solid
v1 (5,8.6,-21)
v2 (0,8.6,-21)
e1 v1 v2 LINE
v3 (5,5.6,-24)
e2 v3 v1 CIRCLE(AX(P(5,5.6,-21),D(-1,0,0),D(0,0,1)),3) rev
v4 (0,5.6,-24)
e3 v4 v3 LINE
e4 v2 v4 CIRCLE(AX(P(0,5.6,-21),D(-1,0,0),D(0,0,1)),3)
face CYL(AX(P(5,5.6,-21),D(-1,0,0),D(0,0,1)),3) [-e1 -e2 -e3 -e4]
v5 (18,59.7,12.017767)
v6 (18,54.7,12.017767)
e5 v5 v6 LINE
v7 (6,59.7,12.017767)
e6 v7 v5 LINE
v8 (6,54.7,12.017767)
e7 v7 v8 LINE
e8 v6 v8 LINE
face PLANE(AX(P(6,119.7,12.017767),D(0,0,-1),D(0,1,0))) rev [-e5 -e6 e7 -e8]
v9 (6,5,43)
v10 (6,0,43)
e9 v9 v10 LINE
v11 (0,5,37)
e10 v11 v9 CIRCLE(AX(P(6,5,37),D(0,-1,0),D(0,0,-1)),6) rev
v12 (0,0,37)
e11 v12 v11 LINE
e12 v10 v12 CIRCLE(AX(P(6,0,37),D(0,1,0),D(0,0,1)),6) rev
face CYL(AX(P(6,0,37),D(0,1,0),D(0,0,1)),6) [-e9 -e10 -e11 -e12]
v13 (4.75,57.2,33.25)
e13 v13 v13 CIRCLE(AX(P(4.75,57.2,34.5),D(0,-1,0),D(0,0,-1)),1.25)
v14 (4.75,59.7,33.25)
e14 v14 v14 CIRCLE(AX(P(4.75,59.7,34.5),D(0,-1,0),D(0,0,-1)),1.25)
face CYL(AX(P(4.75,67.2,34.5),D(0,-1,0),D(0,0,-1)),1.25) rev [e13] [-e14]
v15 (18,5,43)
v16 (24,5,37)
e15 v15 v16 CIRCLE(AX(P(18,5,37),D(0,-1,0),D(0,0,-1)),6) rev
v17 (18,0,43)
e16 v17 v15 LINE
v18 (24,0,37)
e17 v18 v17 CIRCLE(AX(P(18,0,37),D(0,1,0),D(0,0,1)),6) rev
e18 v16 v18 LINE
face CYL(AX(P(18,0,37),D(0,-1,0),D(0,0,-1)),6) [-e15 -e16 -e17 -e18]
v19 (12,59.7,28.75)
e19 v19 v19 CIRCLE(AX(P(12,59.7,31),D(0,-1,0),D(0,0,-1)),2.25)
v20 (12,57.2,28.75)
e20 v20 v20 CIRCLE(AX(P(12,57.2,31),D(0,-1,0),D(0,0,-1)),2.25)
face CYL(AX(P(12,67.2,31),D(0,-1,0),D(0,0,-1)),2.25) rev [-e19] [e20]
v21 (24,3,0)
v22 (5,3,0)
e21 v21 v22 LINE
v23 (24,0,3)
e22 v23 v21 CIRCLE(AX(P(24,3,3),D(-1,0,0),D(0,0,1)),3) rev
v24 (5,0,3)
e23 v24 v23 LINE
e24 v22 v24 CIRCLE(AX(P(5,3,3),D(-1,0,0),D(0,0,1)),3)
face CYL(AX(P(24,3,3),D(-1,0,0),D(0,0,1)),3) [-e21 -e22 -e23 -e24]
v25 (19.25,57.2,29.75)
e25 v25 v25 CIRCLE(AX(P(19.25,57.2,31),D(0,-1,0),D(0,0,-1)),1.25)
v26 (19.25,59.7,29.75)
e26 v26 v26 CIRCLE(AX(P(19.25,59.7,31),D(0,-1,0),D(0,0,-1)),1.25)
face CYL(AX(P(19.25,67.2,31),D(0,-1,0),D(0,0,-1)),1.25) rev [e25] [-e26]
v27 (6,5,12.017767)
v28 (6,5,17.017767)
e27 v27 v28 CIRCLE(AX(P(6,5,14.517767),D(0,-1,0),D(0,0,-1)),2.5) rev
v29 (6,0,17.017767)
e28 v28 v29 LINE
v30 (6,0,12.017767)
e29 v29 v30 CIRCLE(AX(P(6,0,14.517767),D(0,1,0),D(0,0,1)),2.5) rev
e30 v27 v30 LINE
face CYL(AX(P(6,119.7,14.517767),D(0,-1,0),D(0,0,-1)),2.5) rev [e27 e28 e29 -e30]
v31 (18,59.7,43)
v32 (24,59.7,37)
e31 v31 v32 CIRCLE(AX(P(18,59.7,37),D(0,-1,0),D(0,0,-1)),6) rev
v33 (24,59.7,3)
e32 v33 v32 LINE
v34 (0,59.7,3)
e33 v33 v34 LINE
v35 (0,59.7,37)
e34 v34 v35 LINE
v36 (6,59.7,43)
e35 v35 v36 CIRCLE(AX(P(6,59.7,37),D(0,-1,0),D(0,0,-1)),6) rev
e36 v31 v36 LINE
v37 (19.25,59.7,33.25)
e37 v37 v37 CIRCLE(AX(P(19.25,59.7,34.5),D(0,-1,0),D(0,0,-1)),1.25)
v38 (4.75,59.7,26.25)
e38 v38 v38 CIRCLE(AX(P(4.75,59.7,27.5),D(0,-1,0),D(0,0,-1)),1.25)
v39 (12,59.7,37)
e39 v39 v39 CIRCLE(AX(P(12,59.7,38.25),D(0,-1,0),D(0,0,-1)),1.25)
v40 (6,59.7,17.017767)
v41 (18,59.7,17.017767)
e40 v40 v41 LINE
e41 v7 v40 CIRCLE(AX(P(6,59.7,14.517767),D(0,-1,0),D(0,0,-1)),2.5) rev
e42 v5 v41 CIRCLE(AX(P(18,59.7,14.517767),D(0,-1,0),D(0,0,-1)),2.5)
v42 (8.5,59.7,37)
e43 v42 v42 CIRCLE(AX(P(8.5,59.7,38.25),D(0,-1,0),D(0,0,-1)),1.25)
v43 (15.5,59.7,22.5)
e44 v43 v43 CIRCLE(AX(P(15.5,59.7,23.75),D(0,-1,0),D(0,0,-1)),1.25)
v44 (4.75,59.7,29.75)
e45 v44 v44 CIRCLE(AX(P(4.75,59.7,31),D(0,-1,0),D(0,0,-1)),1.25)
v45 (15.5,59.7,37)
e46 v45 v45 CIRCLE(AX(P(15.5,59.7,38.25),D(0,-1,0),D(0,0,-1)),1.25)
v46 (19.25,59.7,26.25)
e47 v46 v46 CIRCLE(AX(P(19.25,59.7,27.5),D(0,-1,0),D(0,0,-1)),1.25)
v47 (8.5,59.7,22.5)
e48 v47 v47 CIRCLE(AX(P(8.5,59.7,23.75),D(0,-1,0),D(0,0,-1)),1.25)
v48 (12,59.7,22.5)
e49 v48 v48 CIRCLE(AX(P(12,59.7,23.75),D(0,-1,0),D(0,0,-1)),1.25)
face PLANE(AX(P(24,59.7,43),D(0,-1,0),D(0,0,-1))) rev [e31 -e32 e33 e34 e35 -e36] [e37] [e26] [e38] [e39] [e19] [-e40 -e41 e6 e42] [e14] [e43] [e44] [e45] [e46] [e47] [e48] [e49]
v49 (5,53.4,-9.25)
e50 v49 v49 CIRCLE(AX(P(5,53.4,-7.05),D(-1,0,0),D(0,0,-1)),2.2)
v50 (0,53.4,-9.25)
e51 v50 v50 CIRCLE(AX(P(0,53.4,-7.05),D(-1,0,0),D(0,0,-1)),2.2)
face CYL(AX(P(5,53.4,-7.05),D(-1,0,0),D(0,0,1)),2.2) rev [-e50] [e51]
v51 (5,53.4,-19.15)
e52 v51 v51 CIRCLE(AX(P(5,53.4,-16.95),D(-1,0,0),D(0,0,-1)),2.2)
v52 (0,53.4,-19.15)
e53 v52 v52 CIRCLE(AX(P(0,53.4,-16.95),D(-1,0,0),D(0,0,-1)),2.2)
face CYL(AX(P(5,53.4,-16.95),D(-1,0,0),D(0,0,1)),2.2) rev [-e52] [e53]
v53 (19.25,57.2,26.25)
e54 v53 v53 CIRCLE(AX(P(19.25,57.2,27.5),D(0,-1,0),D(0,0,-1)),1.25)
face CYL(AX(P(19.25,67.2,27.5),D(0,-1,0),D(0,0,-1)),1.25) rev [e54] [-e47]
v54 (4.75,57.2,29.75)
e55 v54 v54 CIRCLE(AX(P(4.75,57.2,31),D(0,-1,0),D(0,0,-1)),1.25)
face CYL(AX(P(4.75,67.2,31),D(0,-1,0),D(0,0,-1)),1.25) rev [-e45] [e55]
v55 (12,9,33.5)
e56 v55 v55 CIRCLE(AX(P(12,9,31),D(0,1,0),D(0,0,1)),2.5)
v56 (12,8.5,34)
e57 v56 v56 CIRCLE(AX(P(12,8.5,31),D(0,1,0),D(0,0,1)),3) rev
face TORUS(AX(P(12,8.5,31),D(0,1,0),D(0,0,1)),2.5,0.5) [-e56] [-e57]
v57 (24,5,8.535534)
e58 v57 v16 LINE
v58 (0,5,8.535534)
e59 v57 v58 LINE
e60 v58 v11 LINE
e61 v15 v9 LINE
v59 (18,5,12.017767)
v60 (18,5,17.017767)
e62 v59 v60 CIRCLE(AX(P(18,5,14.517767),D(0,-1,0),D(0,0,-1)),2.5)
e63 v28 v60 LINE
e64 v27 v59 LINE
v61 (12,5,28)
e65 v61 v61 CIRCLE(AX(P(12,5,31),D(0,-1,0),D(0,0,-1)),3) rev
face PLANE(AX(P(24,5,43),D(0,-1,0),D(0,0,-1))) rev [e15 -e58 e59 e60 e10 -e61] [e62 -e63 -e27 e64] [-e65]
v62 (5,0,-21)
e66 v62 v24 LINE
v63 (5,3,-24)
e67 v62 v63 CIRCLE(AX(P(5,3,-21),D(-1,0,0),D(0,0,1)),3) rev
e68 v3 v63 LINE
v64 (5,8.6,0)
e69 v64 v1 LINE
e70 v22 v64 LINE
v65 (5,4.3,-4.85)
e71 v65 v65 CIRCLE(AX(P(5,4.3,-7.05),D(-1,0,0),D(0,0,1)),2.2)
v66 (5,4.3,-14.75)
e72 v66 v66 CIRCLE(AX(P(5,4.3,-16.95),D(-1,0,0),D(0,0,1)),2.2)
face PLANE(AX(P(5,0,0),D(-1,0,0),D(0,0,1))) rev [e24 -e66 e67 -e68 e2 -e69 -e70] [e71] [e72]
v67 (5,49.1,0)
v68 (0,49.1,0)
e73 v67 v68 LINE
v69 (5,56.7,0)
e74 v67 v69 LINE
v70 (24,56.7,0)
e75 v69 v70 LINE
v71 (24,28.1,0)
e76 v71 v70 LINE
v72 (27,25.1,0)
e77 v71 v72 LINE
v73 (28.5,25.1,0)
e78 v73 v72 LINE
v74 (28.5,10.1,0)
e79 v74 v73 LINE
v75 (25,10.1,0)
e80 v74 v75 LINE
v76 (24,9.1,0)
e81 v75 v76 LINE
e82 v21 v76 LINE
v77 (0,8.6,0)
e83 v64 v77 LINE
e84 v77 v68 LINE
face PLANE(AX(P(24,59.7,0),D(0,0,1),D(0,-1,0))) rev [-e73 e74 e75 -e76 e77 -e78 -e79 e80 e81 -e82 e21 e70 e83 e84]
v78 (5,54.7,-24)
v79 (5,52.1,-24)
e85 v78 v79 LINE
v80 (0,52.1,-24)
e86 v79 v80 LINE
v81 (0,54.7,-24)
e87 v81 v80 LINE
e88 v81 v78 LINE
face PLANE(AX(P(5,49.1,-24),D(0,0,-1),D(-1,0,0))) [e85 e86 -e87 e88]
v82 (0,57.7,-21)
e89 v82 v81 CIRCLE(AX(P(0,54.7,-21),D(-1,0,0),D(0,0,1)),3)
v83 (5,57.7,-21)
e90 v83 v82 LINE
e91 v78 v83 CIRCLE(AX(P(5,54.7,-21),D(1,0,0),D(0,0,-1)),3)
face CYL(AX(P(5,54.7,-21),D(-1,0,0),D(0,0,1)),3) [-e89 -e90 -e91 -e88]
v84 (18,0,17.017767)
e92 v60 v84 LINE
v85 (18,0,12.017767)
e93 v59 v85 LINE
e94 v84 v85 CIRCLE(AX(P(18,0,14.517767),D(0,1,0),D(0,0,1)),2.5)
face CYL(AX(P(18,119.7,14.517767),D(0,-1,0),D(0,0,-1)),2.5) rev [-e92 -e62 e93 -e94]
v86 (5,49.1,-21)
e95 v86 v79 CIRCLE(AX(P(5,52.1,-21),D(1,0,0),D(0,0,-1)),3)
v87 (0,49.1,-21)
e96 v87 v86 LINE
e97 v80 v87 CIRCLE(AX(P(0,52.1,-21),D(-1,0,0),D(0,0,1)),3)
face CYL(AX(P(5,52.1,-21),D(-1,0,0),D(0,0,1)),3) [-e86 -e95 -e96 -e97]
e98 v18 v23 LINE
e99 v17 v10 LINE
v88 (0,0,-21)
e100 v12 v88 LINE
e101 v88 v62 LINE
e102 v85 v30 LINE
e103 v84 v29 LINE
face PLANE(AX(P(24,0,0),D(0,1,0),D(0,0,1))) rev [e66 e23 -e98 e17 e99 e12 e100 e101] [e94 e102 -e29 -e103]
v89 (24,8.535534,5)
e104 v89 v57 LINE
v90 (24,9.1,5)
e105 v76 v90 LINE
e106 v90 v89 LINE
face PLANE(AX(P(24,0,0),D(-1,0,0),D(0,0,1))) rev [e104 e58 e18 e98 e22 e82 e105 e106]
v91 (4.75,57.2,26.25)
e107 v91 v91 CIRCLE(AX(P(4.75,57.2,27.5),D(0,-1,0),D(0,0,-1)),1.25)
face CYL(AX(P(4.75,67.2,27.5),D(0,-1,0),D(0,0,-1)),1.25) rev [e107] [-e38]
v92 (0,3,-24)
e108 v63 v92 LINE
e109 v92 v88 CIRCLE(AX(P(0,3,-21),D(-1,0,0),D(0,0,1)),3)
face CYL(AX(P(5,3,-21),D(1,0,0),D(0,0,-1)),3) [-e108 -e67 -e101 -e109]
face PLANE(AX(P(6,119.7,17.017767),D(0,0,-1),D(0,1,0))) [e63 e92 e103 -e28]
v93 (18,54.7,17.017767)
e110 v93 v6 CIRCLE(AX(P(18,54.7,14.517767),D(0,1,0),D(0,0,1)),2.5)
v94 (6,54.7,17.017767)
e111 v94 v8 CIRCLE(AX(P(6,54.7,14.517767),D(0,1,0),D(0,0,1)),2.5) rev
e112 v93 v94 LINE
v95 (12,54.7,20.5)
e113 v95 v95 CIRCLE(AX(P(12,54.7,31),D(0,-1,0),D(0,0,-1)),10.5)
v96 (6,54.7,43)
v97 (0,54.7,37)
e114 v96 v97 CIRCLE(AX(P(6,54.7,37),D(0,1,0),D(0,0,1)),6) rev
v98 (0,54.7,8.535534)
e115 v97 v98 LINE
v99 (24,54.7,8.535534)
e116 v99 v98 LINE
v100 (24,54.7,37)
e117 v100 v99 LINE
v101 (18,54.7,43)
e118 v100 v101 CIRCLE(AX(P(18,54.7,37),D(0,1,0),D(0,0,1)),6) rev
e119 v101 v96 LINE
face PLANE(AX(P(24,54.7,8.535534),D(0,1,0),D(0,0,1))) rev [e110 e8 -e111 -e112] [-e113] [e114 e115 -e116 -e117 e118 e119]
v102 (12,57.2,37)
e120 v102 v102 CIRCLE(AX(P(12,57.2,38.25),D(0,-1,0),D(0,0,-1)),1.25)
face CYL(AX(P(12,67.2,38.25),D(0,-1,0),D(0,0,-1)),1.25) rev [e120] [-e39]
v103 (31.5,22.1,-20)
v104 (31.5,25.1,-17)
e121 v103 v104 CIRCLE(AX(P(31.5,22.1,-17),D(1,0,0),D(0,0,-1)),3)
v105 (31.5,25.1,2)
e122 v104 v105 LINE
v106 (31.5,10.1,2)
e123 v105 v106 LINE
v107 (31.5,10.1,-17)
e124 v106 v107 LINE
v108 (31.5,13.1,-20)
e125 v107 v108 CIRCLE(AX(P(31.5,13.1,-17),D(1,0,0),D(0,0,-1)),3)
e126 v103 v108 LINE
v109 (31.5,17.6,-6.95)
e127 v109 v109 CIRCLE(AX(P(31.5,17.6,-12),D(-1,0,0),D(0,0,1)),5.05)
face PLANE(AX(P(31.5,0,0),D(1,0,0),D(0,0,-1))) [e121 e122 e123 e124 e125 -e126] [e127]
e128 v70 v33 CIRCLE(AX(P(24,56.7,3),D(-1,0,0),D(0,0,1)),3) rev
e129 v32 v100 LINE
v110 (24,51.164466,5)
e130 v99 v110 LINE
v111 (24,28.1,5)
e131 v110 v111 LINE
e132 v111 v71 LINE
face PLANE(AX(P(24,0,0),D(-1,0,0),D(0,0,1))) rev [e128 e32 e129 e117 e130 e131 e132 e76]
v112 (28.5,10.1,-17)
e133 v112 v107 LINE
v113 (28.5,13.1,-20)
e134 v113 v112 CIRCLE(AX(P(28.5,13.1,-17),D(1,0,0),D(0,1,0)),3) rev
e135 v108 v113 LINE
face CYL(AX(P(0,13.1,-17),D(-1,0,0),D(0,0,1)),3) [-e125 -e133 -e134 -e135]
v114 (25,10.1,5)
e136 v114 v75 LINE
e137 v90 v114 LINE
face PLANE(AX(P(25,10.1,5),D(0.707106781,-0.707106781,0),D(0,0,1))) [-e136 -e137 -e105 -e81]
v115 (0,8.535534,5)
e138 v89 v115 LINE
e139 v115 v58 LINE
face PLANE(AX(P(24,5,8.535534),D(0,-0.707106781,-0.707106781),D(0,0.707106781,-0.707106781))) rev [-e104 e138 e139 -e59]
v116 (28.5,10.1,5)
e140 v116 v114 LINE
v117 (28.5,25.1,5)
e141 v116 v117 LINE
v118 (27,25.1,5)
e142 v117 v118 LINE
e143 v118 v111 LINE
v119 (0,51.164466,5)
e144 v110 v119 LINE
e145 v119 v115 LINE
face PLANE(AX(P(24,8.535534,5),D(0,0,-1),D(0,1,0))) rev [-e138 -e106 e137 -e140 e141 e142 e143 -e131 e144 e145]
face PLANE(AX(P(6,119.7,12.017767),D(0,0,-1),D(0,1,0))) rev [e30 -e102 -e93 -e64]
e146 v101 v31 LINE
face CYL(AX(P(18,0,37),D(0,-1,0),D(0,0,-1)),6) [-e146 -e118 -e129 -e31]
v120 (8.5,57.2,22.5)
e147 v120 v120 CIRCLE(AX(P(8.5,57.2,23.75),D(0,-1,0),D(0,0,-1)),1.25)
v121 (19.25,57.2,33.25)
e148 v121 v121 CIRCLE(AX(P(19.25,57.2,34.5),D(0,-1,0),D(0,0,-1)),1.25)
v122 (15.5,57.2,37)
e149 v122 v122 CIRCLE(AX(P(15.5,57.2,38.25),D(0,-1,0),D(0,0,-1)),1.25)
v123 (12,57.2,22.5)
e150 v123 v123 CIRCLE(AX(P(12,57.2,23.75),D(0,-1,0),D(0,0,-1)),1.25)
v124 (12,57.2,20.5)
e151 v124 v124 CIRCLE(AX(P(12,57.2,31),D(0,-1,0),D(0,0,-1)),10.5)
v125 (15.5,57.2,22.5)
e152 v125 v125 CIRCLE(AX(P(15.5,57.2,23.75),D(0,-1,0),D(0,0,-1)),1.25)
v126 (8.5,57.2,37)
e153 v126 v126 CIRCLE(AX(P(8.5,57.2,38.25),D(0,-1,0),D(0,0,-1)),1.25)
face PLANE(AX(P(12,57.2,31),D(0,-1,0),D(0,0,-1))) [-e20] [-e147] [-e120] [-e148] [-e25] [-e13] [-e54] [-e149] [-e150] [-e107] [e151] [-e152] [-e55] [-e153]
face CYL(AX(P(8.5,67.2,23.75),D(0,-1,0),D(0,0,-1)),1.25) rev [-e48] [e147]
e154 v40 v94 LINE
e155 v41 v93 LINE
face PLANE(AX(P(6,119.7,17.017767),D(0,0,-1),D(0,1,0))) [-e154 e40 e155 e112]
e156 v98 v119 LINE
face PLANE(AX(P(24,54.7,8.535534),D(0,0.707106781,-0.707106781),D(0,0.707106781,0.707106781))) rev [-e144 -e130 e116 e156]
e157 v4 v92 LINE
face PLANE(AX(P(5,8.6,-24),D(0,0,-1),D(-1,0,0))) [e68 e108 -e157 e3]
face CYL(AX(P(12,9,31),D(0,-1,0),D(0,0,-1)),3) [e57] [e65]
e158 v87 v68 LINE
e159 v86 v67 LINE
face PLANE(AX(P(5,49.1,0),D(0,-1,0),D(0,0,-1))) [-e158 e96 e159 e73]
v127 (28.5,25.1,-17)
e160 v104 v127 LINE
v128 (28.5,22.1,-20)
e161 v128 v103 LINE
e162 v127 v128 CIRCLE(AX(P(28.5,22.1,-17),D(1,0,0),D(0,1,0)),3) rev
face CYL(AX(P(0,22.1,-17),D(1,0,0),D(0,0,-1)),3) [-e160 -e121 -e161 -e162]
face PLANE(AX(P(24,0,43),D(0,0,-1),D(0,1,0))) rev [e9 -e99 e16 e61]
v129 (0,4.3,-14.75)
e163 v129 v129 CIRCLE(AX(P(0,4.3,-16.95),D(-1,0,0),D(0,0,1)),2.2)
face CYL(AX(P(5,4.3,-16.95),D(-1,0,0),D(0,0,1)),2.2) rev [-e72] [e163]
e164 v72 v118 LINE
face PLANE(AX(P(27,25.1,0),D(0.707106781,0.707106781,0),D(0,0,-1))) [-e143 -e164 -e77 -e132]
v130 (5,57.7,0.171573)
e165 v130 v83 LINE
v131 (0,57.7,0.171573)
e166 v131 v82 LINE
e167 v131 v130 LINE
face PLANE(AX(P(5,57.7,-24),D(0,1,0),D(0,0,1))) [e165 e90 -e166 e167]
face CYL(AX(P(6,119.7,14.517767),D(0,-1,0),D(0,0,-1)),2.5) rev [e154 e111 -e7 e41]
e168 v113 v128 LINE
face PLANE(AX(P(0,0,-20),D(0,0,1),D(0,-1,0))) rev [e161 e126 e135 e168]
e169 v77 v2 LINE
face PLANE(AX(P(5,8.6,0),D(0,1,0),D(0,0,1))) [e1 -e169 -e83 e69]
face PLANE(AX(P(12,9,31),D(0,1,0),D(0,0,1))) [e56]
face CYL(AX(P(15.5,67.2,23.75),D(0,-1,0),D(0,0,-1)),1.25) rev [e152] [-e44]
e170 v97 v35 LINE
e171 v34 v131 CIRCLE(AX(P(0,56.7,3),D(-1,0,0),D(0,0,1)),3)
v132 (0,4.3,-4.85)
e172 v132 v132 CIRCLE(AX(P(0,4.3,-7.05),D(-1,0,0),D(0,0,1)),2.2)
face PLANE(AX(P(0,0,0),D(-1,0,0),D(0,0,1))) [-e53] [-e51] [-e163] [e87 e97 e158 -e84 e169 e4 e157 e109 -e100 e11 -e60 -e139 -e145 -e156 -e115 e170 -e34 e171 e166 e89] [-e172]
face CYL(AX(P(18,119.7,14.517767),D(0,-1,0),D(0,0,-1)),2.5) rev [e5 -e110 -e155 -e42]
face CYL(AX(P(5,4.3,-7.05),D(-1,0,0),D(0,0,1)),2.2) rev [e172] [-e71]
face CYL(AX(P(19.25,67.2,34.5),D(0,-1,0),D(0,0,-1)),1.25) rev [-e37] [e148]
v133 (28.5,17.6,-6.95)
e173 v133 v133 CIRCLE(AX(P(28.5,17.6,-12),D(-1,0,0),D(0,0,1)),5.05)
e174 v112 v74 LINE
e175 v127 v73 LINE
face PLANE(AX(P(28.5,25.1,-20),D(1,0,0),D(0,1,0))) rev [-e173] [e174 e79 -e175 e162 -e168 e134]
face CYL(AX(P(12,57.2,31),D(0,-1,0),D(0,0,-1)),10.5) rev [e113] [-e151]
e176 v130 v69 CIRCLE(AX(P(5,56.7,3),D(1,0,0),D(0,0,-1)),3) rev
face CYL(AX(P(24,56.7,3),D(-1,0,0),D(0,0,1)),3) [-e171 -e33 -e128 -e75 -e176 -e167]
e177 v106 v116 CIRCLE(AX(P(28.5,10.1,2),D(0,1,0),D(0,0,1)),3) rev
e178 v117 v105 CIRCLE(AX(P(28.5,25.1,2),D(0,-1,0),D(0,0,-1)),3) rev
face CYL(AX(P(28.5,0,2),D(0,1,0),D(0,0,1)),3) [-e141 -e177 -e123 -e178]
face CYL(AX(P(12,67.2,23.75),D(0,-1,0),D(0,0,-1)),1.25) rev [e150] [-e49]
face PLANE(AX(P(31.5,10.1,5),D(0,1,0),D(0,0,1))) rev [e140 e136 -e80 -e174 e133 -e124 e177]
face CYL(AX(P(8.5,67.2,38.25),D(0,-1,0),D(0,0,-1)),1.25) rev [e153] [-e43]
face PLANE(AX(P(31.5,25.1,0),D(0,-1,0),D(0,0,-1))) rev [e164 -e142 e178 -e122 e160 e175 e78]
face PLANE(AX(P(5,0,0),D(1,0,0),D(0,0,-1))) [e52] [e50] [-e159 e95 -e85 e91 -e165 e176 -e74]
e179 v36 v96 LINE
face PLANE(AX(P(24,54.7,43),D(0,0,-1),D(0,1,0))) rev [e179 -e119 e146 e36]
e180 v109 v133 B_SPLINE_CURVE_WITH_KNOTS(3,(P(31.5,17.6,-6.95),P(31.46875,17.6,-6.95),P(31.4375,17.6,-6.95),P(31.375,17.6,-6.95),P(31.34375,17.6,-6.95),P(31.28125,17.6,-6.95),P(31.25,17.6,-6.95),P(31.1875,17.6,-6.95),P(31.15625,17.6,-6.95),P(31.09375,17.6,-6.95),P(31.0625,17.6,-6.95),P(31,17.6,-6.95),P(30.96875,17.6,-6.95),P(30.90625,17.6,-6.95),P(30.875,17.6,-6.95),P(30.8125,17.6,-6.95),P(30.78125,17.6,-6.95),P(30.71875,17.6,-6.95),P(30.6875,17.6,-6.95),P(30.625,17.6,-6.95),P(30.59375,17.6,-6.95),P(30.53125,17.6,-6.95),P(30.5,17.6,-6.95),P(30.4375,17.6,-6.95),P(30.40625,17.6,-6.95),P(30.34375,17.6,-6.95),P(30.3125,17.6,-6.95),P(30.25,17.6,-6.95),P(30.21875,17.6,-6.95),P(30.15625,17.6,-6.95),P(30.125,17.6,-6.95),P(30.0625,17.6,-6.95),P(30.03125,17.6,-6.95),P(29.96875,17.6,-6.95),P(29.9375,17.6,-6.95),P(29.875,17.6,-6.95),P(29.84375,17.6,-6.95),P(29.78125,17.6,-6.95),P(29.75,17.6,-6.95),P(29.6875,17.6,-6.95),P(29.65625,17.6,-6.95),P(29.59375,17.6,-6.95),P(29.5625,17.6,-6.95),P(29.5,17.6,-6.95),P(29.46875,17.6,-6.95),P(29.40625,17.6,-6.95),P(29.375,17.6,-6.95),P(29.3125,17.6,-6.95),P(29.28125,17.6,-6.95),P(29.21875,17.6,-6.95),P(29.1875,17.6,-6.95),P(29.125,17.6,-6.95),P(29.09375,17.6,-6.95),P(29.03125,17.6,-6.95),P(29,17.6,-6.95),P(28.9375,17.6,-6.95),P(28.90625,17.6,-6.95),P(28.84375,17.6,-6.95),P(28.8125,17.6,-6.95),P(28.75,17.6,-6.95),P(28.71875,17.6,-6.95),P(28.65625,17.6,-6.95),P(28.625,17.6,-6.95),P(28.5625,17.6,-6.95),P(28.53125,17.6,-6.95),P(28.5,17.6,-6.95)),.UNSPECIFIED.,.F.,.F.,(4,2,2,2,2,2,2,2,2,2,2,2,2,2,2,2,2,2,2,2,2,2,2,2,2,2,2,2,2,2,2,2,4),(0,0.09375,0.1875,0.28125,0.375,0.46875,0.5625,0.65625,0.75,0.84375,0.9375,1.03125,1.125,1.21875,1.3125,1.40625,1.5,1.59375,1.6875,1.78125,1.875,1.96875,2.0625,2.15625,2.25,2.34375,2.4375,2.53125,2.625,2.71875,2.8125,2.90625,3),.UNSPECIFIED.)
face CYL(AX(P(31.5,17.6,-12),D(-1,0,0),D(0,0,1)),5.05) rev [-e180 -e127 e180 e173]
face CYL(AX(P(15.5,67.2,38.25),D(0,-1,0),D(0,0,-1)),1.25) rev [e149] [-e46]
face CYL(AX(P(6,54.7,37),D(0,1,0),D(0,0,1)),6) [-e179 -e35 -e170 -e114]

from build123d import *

# Parameters (mm, degrees)
BOSS_EXTRUDE1_DEPTH = 24
SKETCH2_R           = 10.5
CUT_EXTRUDE1_DEPTH  = 2.5
SKETCH4_R           = 2.25
SKETCH4_R_2         = 1.25
CUT_EXTRUDE2_DEPTH  = 10
SKETCH11_R          = 3
BOSS_EXTRUDE2_DEPTH = 4
CUT_EXTRUDE5_DEPTH  = 65
SKETCH13_W          = 24
SKETCH13_H          = 8.6
SKETCH13_R          = 2.2
BOSS_EXTRUDE3_DEPTH = 5
SKETCH14_W          = 5
SKETCH14_H          = 15
BOSS_EXTRUDE4_DEPTH = 7.5
SKETCH15_W          = 3
SKETCH15_H          = 15
BOSS_EXTRUDE5_DEPTH = 20
SKETCH16_R          = 5.05
CUT_EXTRUDE6_DEPTH  = 79.900823823
CHAMFER1_SIZE       = 3
CHAMFER2_SIZE       = 1
FILLET2_R           = 6
FILLET7_R           = 3
FILLET8_R           = 0.5


with BuildPart() as part:
    # Sketch1 → Boss-Extrude1 (new body)
    with BuildSketch(Plane(origin=(0, 0, 0), x_dir=(0, 0, -1), z_dir=(1, 0, 0))):
        Polygon((0, 59.7), (0, 0), (-43, 0), (-43, 5), (-8.535533906, 5), (-5, 8.535533906), (-5, 51.164466094), (-8.535533906, 54.7), (-43, 54.7), (-43, 59.7), align=None)
    extrude(amount=BOSS_EXTRUDE1_DEPTH)

    # Sketch2 → Cut-Extrude1 (cut)
    with BuildSketch(Plane.XZ.offset(-54.7)):
        with Locations(Location((12, 31, 0), (0, 0, 270))):
            Circle(SKETCH2_R)
    extrude(amount=-CUT_EXTRUDE1_DEPTH, mode=Mode.SUBTRACT)

    # Sketch4 → Cut-Extrude2 (cut)
    with BuildSketch(Plane.XZ.offset(-57.2)):
        with Locations(Location((12, 31, 0), (0, 0, 270))):
            Circle(SKETCH4_R)
        with Locations(Location((12, 38.25, 0), (0, 0, 270))):
            Circle(SKETCH4_R_2)
        with Locations(Location((8.5, 38.25, 0), (0, 0, 270))):
            Circle(SKETCH4_R_2)
        with Locations(Location((15.5, 38.25, 0), (0, 0, 270))):
            Circle(SKETCH4_R_2)
        with Locations(Location((19.25, 34.5, 0), (0, 0, 270))):
            Circle(SKETCH4_R_2)
        with Locations(Location((19.25, 31, 0), (0, 0, 270))):
            Circle(SKETCH4_R_2)
        with Locations(Location((19.25, 27.5, 0), (0, 0, 270))):
            Circle(SKETCH4_R_2)
        with Locations(Location((15.5, 23.75, 0), (0, 0, 270))):
            Circle(SKETCH4_R_2)
        with Locations(Location((12, 23.75, 0), (0, 0, 270))):
            Circle(SKETCH4_R_2)
        with Locations(Location((8.5, 23.75, 0), (0, 0, 270))):
            Circle(SKETCH4_R_2)
        with Locations(Location((4.75, 27.5, 0), (0, 0, 270))):
            Circle(SKETCH4_R_2)
        with Locations(Location((4.75, 31, 0), (0, 0, 270))):
            Circle(SKETCH4_R_2)
        with Locations(Location((4.75, 34.5, 0), (0, 0, 270))):
            Circle(SKETCH4_R_2)
    extrude(amount=-CUT_EXTRUDE2_DEPTH, mode=Mode.SUBTRACT)

    # Sketch11 → Boss-Extrude2 (add)
    with BuildSketch(Plane(origin=(0, 5, 0), x_dir=(1, 0, 0), z_dir=(0, 1, 0))):
        with Locations(Location((12, -31, 0), (0, 0, 90))):
            Circle(SKETCH11_R)
    extrude(amount=BOSS_EXTRUDE2_DEPTH)

    # Sketch12 → Cut-Extrude5 (cut, symmetric)
    with BuildSketch(Plane.XZ.offset(-54.7)):
        with BuildLine():
            Line((6, 12.017766953), (18, 12.017766953))
            ThreePointArc((18, 12.017766953), (20.5, 14.517766953), (18, 17.017766953))
            Line((18, 17.017766953), (6, 17.017766953))
            ThreePointArc((6, 17.017766953), (3.5, 14.517766953), (6, 12.017766953))
        make_face()
    extrude(amount=CUT_EXTRUDE5_DEPTH, both=True, mode=Mode.SUBTRACT)

    # Sketch13 → Boss-Extrude3 (add)
    # profile 1 of 2: a face of its own
    with BuildSketch(Plane.ZY):
        with Locations((-12, 4.3)):
            Rectangle(SKETCH13_W, SKETCH13_H)
        with Locations((-16.95, 4.3)):
            Circle(SKETCH13_R, mode=Mode.SUBTRACT)
        with Locations((-7.05, 4.3)):
            Circle(SKETCH13_R, mode=Mode.SUBTRACT)
    # profile 2 of 2: a face of its own
    with BuildSketch(Plane.ZY):
        with Locations((-12, 53.4)):
            Rectangle(SKETCH13_W, SKETCH13_H)
        with Locations(Location((-16.95, 53.4, 0), (0, 0, 180))):
            Circle(SKETCH13_R, mode=Mode.SUBTRACT)
        with Locations(Location((-7.05, 53.4, 0), (0, 0, 180))):
            Circle(SKETCH13_R, mode=Mode.SUBTRACT)
    extrude(amount=-BOSS_EXTRUDE3_DEPTH)

    # Sketch14 → Boss-Extrude4 (add)
    with BuildSketch(Plane(origin=(24, 0, 0), x_dir=(0, 0, -1), z_dir=(1, 0, 0))):
        with Locations((-2.5, 17.6)):
            Rectangle(SKETCH14_W, SKETCH14_H)
    extrude(amount=BOSS_EXTRUDE4_DEPTH)

    # Sketch15 → Boss-Extrude5 (add)
    with BuildSketch(Plane(origin=(0, 0, 0), x_dir=(-1, 0, 0), z_dir=(0, 0, -1))):
        with Locations((-30, 17.6)):
            Rectangle(SKETCH15_W, SKETCH15_H)
    extrude(amount=BOSS_EXTRUDE5_DEPTH)

    # Sketch16 → Cut-Extrude6 (cut, through all)
    with BuildSketch(Plane.ZY.offset(-28.5)):
        with Locations((-12, 17.6)):
            Circle(SKETCH16_R)
    extrude(amount=-CUT_EXTRUDE6_DEPTH, mode=Mode.SUBTRACT)

    # Chamfer1
    chamfer1_edges = [part.edges().sort_by_distance(p)[0] for p in [
        (24, 25.1, 2.5),
    ]]
    chamfer(chamfer1_edges, length=CHAMFER1_SIZE)

    # Chamfer2
    chamfer2_edges = [part.edges().sort_by_distance(p)[0] for p in [
        (24, 10.1, 2.5),
    ]]
    chamfer(chamfer2_edges, length=CHAMFER2_SIZE)

    # Fillet2
    fillet2_edges = [part.edges().sort_by_distance(p)[0] for p in [
        (0, 2.5, 43),
        (0, 57.2, 43),
        (24, 2.5, 43),
        (24, 57.2, 43),
    ]]
    fillet(fillet2_edges, radius=FILLET2_R)

    # Fillet7
    # the kernel refuses this fillet: 3 mm, written as the material it takes off along each edge
    with BuildSketch(Plane(origin=(-7.5, 59.7, 0), x_dir=(0, -1, 0), z_dir=(1, 0, 0))) as fillet7_piece_1_section:
        with BuildLine():
            CenterArc((FILLET7_R, -FILLET7_R), FILLET7_R, 90, 90)
            Line((0, -FILLET7_R), (0, 0))
            Line((0, 0), (FILLET7_R, 0))
        make_face()
    fillet7_piece_1 = extrude(amount=39, mode=Mode.PRIVATE)
    fillet7_piece_1 = split(fillet7_piece_1, bisect_by=Plane(origin=(2.5, 57.7, 0.688760919), z_dir=(0, 1, 0)), keep=Keep.TOP, mode=Mode.PRIVATE)
    add(fillet7_piece_1, mode=Mode.SUBTRACT)
    with BuildSketch(Plane(origin=(-7.5, 59.7, 0), x_dir=(0, -1, 0), z_dir=(1, 0, 0))) as fillet7_piece_2_section:
        with BuildLine():
            CenterArc((FILLET7_R, -FILLET7_R), FILLET7_R, 90, 90)
            Line((0, -FILLET7_R), (0, 0))
            Line((0, 0), (FILLET7_R, 0))
        make_face()
    fillet7_piece_2 = extrude(amount=39, mode=Mode.PRIVATE)
    fillet7_piece_2 = split(fillet7_piece_2, bisect_by=Plane(origin=(5, 57.451452112, 0.051209323), z_dir=(1, 0, 0)), keep=Keep.TOP, mode=Mode.PRIVATE)
    add(fillet7_piece_2, mode=Mode.SUBTRACT)
    with BuildSketch(Plane(origin=(-7.5, 0, -24), x_dir=(0, 0, 1), z_dir=(1, 0, 0)), Plane(origin=(-7.5, 8.6, -24), x_dir=(0, -1, 0), z_dir=(1, 0, 0)), Plane(origin=(-7.5, 49.1, -24), x_dir=(0, 0, 1), z_dir=(1, 0, 0))) as fillet7_piece_3:
        with BuildLine():
            CenterArc((FILLET7_R, -FILLET7_R), FILLET7_R, 90, 90)
            Line((0, -FILLET7_R), (0, 0))
            Line((0, 0), (FILLET7_R, 0))
        make_face()
    extrude(amount=20, mode=Mode.SUBTRACT)
    with BuildSketch(Plane(origin=(-7.5, 57.7, -24), x_dir=(0, 0, 1), z_dir=(1, 0, 0))) as fillet7_piece_4:
        with BuildLine():
            CenterArc((FILLET7_R, FILLET7_R), FILLET7_R, 180, 90)
            Line((0, FILLET7_R), (0, 0))
            Line((0, 0), (FILLET7_R, 0))
        make_face()
    extrude(amount=20, mode=Mode.SUBTRACT)
    with BuildSketch(Plane(origin=(31.5, 32.6, 5), x_dir=(-1, 0, 0), z_dir=(0, -1, 0))) as fillet7_piece_5:
        with BuildLine():
            CenterArc((FILLET7_R, FILLET7_R), FILLET7_R, 180, 90)
            Line((0, FILLET7_R), (0, 0))
            Line((0, 0), (FILLET7_R, 0))
        make_face()
    extrude(amount=30, mode=Mode.SUBTRACT)
    with BuildSketch(Plane(origin=(21, 10.1, -20), x_dir=(0, 0, 1), z_dir=(1, 0, 0)), Plane(origin=(39, 25.1, -20), x_dir=(0, 0, 1), z_dir=(-1, 0, 0))) as fillet7_piece_6:
        with BuildLine():
            CenterArc((FILLET7_R, -FILLET7_R), FILLET7_R, 90, 90)
            Line((0, -FILLET7_R), (0, 0))
            Line((0, 0), (FILLET7_R, 0))
        make_face()
    extrude(amount=18, mode=Mode.SUBTRACT)
    with BuildSketch(Plane(origin=(5, 0, 0), x_dir=(0, 0, 1), z_dir=(1, 0, 0))) as fillet7_piece_7:
        with BuildLine():
            CenterArc((FILLET7_R, -FILLET7_R), FILLET7_R, 90, 90)
            Line((0, -FILLET7_R), (0, 0))
            Line((0, 0), (FILLET7_R, 0))
        make_face()
    extrude(amount=26.5, mode=Mode.SUBTRACT)

    # Fillet8
    fillet8_edges = [part.edges().sort_by_distance(p)[0] for p in [
        (12, 9, 34),
    ]]
    fillet(fillet8_edges, radius=FILLET8_R)


solid = part.part
